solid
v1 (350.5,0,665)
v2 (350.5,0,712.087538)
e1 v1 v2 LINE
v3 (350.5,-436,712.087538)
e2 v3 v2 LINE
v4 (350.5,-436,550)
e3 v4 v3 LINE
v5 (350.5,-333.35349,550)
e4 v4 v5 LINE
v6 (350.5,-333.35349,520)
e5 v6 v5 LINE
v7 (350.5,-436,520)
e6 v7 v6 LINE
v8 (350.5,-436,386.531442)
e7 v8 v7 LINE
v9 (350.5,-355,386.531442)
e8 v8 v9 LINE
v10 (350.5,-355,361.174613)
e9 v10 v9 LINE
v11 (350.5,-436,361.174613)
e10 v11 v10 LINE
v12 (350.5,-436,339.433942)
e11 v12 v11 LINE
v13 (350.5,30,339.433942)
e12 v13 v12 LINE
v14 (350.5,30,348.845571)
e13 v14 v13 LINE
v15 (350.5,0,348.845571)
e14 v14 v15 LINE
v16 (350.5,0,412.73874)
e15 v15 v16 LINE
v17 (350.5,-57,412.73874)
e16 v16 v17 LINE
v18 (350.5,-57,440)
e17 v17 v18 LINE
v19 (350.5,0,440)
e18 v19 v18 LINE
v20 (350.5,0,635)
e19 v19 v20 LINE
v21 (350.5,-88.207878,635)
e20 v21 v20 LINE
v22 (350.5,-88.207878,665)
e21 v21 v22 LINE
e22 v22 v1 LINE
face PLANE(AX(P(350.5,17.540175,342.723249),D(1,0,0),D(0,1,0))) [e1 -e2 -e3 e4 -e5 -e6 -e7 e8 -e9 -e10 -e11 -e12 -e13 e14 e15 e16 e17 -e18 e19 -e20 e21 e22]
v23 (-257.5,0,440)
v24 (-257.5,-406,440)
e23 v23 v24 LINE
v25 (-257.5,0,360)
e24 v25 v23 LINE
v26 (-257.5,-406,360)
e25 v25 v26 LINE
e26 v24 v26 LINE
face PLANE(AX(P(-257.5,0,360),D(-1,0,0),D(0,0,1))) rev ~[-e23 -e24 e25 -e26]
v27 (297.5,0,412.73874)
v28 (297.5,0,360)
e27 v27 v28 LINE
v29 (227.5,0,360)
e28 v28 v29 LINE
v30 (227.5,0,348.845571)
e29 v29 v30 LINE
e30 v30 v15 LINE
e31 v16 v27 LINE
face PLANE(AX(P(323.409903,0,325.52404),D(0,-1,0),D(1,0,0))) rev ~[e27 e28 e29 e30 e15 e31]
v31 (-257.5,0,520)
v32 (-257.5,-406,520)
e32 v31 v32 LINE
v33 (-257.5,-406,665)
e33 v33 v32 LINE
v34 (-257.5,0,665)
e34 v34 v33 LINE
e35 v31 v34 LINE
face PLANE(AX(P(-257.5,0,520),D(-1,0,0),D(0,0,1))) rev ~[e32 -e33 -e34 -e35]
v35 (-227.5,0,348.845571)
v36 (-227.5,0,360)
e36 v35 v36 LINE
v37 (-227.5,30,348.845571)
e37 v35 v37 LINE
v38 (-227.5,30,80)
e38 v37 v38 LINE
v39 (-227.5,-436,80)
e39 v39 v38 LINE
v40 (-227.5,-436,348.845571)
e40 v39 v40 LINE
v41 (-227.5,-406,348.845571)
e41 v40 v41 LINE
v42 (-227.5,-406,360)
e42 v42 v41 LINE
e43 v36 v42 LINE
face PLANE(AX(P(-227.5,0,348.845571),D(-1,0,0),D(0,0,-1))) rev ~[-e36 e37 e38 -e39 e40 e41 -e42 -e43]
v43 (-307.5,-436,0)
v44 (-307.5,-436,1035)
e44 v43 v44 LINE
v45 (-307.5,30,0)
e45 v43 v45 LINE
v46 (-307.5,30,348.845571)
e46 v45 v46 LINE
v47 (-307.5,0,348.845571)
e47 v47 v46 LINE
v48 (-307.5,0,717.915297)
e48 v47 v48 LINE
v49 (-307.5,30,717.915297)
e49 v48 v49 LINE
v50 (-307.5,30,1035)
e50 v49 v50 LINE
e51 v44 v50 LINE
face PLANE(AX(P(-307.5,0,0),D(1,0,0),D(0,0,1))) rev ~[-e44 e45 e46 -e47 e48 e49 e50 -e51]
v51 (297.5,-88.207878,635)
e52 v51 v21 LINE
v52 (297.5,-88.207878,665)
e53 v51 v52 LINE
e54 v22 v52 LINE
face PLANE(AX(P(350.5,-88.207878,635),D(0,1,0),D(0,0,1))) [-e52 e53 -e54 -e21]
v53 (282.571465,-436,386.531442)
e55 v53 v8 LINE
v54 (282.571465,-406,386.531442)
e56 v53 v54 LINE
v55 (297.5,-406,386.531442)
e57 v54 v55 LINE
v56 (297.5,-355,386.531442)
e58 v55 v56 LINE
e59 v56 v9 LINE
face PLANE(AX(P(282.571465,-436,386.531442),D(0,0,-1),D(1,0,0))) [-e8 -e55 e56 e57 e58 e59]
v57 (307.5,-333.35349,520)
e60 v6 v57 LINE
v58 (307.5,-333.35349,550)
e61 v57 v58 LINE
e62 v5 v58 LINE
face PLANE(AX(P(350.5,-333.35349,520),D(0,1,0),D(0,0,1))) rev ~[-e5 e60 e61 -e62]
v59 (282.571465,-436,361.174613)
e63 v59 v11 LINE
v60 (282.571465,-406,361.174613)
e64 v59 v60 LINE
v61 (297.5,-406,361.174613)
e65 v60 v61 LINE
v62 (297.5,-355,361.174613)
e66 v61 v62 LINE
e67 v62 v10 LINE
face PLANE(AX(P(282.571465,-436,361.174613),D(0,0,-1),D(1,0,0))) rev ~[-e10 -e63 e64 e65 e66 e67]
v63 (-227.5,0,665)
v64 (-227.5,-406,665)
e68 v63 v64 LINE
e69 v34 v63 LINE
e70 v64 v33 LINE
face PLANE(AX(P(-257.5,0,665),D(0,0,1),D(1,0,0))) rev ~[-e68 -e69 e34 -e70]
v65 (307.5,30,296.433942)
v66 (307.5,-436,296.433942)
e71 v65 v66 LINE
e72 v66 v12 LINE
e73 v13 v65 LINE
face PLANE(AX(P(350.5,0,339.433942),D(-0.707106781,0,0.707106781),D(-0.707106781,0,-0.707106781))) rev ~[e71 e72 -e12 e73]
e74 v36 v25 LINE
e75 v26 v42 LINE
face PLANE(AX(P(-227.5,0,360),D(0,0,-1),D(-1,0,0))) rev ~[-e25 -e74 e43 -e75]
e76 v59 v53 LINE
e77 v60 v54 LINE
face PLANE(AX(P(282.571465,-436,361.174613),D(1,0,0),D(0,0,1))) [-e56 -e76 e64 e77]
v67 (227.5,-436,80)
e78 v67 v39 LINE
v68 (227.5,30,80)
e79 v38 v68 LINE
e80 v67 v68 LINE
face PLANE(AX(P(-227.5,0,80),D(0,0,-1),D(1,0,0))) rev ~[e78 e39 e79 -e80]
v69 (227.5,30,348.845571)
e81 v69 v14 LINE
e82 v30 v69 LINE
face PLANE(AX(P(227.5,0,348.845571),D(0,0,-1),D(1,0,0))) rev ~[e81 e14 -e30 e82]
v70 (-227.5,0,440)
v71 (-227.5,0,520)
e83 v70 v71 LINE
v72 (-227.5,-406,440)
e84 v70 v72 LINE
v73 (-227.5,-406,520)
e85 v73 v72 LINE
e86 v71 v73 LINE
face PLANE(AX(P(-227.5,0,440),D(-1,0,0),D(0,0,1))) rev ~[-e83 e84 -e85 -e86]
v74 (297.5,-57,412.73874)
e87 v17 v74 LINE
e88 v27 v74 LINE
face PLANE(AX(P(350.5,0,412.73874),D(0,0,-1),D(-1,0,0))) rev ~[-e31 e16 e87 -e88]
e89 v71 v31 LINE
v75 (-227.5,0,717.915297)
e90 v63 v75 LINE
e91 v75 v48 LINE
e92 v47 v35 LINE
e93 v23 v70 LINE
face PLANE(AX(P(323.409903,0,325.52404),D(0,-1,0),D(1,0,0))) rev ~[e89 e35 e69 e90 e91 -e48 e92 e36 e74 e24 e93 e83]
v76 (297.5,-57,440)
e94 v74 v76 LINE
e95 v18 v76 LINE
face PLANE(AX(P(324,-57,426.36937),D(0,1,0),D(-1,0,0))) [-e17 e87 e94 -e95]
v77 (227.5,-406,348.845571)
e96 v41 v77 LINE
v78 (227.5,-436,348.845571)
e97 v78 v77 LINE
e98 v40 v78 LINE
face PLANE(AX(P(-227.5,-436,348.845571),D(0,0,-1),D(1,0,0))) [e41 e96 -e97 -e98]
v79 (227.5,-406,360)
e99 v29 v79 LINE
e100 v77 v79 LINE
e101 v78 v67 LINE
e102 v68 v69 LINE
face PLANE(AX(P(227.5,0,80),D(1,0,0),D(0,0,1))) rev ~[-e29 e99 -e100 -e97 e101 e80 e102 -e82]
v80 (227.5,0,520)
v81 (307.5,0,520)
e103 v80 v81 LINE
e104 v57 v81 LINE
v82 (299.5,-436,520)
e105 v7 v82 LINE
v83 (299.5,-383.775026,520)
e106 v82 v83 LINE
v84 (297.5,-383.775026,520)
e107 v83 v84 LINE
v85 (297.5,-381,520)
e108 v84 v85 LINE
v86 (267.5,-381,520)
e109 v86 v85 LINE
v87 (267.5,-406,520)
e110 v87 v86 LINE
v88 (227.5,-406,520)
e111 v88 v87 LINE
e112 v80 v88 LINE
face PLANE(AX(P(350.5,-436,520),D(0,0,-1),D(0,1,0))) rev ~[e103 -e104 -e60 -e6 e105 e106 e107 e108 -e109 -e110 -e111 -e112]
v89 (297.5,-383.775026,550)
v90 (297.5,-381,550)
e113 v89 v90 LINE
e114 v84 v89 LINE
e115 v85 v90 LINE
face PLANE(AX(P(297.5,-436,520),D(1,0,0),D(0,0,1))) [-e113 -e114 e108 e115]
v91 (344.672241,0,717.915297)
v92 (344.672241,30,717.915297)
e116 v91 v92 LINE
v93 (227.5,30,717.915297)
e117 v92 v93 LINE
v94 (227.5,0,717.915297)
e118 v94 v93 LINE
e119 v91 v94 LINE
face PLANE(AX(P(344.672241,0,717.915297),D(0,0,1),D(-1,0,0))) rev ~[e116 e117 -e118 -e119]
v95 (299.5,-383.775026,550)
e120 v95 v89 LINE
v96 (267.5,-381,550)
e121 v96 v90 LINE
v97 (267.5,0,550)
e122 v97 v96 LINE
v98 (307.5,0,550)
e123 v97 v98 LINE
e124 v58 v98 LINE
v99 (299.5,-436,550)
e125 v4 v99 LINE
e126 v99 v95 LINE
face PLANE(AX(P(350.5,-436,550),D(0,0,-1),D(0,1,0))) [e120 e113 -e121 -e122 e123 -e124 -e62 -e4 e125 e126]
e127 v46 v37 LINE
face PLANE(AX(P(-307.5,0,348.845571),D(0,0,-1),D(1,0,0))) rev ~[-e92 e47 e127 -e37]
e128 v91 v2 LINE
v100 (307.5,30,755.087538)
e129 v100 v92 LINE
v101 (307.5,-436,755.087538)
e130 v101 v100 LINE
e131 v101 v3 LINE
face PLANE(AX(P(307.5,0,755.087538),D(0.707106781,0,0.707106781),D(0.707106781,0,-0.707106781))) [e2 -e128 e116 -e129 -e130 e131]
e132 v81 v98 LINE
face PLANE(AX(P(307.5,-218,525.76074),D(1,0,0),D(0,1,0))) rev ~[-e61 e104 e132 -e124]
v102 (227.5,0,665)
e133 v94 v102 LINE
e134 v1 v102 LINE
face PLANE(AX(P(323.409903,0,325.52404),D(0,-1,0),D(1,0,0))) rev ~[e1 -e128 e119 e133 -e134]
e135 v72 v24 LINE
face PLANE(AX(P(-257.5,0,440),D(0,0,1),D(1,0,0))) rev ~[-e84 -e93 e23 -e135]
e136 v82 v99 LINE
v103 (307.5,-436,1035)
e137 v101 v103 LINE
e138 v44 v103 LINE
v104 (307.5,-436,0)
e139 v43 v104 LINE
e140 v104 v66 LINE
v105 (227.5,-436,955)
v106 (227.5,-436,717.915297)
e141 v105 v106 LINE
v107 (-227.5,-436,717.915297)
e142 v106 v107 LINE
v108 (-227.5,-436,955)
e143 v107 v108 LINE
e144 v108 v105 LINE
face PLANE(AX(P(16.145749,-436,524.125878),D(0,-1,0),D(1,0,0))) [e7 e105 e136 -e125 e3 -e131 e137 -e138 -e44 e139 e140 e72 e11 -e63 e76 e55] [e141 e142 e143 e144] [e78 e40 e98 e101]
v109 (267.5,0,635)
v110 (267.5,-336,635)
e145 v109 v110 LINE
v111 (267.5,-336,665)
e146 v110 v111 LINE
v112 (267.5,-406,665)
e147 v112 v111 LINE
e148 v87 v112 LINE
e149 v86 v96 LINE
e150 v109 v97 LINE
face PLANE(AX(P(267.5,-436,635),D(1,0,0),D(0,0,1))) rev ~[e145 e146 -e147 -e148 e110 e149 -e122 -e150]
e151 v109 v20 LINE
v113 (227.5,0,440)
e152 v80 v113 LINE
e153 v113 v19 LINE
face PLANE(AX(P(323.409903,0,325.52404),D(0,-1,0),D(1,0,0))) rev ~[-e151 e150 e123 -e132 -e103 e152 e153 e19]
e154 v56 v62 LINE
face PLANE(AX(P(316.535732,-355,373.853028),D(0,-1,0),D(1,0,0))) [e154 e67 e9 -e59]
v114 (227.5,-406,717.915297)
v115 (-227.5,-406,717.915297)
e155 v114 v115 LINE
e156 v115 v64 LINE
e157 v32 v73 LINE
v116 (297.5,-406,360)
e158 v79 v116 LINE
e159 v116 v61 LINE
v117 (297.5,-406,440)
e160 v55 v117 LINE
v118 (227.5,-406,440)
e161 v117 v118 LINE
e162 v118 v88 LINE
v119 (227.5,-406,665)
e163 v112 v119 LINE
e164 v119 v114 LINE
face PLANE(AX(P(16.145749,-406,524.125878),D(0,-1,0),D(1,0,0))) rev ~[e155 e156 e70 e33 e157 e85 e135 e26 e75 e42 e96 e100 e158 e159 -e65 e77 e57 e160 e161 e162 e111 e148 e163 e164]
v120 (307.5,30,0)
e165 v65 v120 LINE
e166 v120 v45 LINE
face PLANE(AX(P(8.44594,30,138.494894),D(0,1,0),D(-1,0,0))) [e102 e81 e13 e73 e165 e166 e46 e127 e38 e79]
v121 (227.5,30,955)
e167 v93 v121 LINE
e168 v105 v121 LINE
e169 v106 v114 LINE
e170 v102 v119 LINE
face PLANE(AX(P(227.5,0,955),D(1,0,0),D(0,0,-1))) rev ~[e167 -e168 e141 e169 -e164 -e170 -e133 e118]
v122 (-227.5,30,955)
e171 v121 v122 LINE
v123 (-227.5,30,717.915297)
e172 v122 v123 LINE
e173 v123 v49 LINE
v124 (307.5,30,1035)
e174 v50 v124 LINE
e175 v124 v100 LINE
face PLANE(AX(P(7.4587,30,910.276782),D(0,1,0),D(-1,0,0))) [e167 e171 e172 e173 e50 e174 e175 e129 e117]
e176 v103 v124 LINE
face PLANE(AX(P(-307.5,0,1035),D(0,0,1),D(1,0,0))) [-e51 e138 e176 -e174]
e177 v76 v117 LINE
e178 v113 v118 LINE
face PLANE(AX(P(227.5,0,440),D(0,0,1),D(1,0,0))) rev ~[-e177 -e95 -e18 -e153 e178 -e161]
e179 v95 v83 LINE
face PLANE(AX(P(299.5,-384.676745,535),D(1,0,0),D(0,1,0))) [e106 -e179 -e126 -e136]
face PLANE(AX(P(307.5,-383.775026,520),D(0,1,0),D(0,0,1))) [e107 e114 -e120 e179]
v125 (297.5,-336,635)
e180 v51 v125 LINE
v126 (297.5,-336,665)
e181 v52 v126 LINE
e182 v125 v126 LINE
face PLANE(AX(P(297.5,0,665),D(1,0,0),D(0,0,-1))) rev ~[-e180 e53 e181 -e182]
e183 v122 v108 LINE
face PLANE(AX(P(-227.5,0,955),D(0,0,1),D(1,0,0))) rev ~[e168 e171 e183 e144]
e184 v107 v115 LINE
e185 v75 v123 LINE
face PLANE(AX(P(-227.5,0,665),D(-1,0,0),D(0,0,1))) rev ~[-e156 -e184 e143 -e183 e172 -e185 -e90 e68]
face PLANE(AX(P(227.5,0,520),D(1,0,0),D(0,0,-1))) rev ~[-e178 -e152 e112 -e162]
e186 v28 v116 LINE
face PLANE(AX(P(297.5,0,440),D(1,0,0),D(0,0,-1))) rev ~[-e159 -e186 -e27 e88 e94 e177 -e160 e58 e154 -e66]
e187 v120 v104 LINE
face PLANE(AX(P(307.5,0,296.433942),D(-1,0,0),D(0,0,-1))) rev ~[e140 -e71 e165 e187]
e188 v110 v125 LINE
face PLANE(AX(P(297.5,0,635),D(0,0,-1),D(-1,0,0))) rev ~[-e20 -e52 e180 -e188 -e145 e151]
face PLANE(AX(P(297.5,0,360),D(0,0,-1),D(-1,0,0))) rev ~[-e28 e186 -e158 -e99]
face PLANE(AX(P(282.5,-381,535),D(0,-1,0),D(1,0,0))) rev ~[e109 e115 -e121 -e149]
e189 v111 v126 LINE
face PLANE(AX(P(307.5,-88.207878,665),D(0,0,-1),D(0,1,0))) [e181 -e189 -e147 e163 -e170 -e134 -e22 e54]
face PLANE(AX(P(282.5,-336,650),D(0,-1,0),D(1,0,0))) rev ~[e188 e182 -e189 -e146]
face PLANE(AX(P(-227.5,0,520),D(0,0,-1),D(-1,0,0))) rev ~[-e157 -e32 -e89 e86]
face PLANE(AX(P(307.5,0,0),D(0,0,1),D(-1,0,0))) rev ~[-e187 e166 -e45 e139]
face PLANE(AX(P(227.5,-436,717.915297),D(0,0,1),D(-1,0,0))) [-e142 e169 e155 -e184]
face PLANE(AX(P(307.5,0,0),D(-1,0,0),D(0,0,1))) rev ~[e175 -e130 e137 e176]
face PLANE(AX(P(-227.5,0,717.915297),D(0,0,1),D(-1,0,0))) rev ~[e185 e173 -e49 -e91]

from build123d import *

# Parameters (mm, degrees)
F0_W        = 615
F0_H        = 1035
F1_DEPTH    = 436
F2_W        = 383.7750256062
F2_H        = 30
F2_W_2      = 88.2078781724
F3_DEPTH    = 10
F4_W        = 436
F4_H        = 368.6535954475
F5_DEPTH    = 43
F6_T4_DEPTH = 436
F6_T9_DEPTH = 436
F7_W        = 102.6465103626
F7_H        = 30
F7_W_2      = 88.2078781724
F8_DEPTH    = 51
F9_W        = 30
F9_H        = 30
F10_DEPTH   = 55
F11_W       = 30
F11_H       = 30
F12_DEPTH   = 100
F14_DEPTH   = 30
F15_W       = 53
F15_H       = 27.2612595558
F16_DEPTH   = 57
F17_W       = 67.928535223
F17_H       = 25.3568291664
F18_DEPTH   = 81
F20_DEPTH   = 30
F22_DEPTH   = 25


# Not quite as in the source:
# - a fillet or chamfer that OpenCascade refuses, or shapes differently, is made with other operations: its cross-section is extruded or revolved along the edge and cut away or added


with BuildPart() as f1:
    # F0 (on Front) → F1 (new body)
    with BuildSketch(Plane.XZ):
        with Locations((0, 517.5)):
            Rectangle(F0_W, F0_H)
        Polygon((227.5, 80), (-227.5, 80), (-227.5, 360), (-257.5, 360), (-257.5, 440), (-227.5, 440), (-227.5, 520), (-257.5, 520), (-257.5, 665), (-227.5, 665), (-227.5, 955), (227.5, 955), (227.5, 665), (267.5, 665), (297.5, 665), (297.5, 635), (267.5, 635), (267.5, 550), (297.5, 550), (297.5, 520), (267.5, 520), (227.5, 520), (227.5, 440), (297.5, 440), (297.5, 360), (227.5, 360), align=None, mode=Mode.SUBTRACT)
    extrude(amount=F1_DEPTH)

    # F2 (on face) → F3 (cut, through all)
    with BuildSketch(Plane.YZ.offset(307.5)):
        with Locations((-191.8875128031, 535)):
            Rectangle(F2_W, F2_H)
        with Locations((-44.1039390862, 650)):
            Rectangle(F2_W_2, F2_H)
    extrude(amount=-F3_DEPTH, mode=Mode.SUBTRACT)

    # F4 (on face) → F5 (join)
    with BuildSketch(Plane.YZ.offset(307.5)):
        with Locations((-218, 525.7607400417)):
            Rectangle(F4_W, F4_H)
    extrude(amount=F5_DEPTH)

    # F6: chamfer of 45 on 2 edges, made by hand


with BuildPart() as f6_tool2:
    # F6_s3 → F6_t4 (new body)
    with BuildSketch(Plane.XZ):
        Polygon((307.5, 755.0875377655), (352.5, 710.0875377655), (307.5, 710.0875377655), align=None)
    extrude(amount=F6_T4_DEPTH)

    split(bisect_by=Plane.YZ.offset(350.5), keep=Keep.BOTTOM)


with BuildPart() as f1_1:
    add(f1.part)

    # F6_t1: union F6_tool2
    add(f6_tool2.part)


with BuildPart() as f6_tool7:
    # F6_s8 → F6_t9 (new body)
    with BuildSketch(Plane.XZ.offset(436)):
        Polygon((307.5, 296.433942318), (352.5, 341.433942318), (307.5, 341.433942318), align=None)
    extrude(amount=-F6_T9_DEPTH)

    split(bisect_by=Plane.YZ.offset(350.5), keep=Keep.BOTTOM)


with BuildPart() as f1_2:
    add(f1_1.part)

    # F6_t6: union F6_tool7
    add(f6_tool7.part)

    # F7 (on face) → F8 (cut)
    with BuildSketch(Plane.YZ.offset(350.5)):
        with Locations((-384.6767448187, 535)):
            Rectangle(F7_W, F7_H)
        with Locations((-44.1039390862, 650)):
            Rectangle(F7_W_2, F7_H)
    extrude(amount=-F8_DEPTH, mode=Mode.SUBTRACT)

    # F9 (on face) → F10 (join)
    with BuildSketch(Plane.XZ.offset(436)):
        with Locations((282.5, 535)):
            Rectangle(F9_W, F9_H)
    extrude(amount=-F10_DEPTH)

    # F11 (on face) → F12 (join)
    with BuildSketch(Plane.XZ.offset(436)):
        with Locations((282.5, 650)):
            Rectangle(F11_W, F11_H)
    extrude(amount=-F12_DEPTH)

    # F13 (on face) → F14 (join)
    with BuildSketch(Plane.XZ.offset(436)):
        Polygon((227.5, 665), (227.5, 717.9152965546), (-227.5, 717.9152965546), (-227.5, 665), (-257.5, 665), (-257.5, 520), (-227.5, 520), (-227.5, 440), (-257.5, 440), (-257.5, 360), (-227.5, 360), (-227.5, 348.8455712795), (227.5, 348.8455712795), (227.5, 360), (297.5, 360), (297.5, 440), (227.5, 440), (227.5, 520), (267.5, 520), (267.5, 665), align=None)
    extrude(amount=-F14_DEPTH)

    # F15 (on face) → F16 (cut)
    with BuildSketch(Plane(origin=(0, 0, 0), x_dir=(-1, 0, 0), z_dir=(0, 1, 0))):
        with Locations((-324, 426.3693702221)):
            Rectangle(F15_W, F15_H)
    extrude(amount=-F16_DEPTH, mode=Mode.SUBTRACT)

    # F17 (on face) → F18 (cut)
    with BuildSketch(Plane.XZ.offset(436)):
        with Locations((316.5357323885, 373.8530278206)):
            Rectangle(F17_W, F17_H)
    extrude(amount=-F18_DEPTH, mode=Mode.SUBTRACT)

    # F19 (on face) → F20 (join)
    with BuildSketch(Plane(origin=(0, 0, 0), x_dir=(-1, 0, 0), z_dir=(0, 1, 0))):
        Polygon((307.5, 0), (307.5, 348.8455712795), (227.5, 348.8455712795), (227.5, 80), (-227.5, 80), (-227.5, 348.8455712795), (-350.5, 348.8455712795), (-350.5, 339.433942318), (-307.5, 296.433942318), (-307.5, 0), align=None)
        Polygon((-359.9116289616, 348.8455712795), (-350.5, 339.433942318), (-350.5, 348.8455712795), align=None)
        Polygon((-344.6722412109, 717.9152965546), (-227.5, 717.9152965546), (-227.5, 955), (227.5, 955), (227.5, 717.9152965546), (307.5, 717.9152965546), (307.5, 1035), (-307.5, 1035), (-307.5, 755.0875377655), align=None)
    extrude(amount=F20_DEPTH)

    # F21 (on face) → F22 (cut)
    with BuildSketch(Plane.YZ.offset(350.5)):
        Polygon((52.2877275944, 373.7032711506), (0, 373.7032711506), (0, 348.8455712795), (0, 339.433942318), (-23.2749842107, 339.433942318), (-23.2749842107, 317.8108334541), (52.2877275944, 317.8108334541), align=None)
    extrude(amount=F22_DEPTH, mode=Mode.SUBTRACT)


solid = f1_2.part
